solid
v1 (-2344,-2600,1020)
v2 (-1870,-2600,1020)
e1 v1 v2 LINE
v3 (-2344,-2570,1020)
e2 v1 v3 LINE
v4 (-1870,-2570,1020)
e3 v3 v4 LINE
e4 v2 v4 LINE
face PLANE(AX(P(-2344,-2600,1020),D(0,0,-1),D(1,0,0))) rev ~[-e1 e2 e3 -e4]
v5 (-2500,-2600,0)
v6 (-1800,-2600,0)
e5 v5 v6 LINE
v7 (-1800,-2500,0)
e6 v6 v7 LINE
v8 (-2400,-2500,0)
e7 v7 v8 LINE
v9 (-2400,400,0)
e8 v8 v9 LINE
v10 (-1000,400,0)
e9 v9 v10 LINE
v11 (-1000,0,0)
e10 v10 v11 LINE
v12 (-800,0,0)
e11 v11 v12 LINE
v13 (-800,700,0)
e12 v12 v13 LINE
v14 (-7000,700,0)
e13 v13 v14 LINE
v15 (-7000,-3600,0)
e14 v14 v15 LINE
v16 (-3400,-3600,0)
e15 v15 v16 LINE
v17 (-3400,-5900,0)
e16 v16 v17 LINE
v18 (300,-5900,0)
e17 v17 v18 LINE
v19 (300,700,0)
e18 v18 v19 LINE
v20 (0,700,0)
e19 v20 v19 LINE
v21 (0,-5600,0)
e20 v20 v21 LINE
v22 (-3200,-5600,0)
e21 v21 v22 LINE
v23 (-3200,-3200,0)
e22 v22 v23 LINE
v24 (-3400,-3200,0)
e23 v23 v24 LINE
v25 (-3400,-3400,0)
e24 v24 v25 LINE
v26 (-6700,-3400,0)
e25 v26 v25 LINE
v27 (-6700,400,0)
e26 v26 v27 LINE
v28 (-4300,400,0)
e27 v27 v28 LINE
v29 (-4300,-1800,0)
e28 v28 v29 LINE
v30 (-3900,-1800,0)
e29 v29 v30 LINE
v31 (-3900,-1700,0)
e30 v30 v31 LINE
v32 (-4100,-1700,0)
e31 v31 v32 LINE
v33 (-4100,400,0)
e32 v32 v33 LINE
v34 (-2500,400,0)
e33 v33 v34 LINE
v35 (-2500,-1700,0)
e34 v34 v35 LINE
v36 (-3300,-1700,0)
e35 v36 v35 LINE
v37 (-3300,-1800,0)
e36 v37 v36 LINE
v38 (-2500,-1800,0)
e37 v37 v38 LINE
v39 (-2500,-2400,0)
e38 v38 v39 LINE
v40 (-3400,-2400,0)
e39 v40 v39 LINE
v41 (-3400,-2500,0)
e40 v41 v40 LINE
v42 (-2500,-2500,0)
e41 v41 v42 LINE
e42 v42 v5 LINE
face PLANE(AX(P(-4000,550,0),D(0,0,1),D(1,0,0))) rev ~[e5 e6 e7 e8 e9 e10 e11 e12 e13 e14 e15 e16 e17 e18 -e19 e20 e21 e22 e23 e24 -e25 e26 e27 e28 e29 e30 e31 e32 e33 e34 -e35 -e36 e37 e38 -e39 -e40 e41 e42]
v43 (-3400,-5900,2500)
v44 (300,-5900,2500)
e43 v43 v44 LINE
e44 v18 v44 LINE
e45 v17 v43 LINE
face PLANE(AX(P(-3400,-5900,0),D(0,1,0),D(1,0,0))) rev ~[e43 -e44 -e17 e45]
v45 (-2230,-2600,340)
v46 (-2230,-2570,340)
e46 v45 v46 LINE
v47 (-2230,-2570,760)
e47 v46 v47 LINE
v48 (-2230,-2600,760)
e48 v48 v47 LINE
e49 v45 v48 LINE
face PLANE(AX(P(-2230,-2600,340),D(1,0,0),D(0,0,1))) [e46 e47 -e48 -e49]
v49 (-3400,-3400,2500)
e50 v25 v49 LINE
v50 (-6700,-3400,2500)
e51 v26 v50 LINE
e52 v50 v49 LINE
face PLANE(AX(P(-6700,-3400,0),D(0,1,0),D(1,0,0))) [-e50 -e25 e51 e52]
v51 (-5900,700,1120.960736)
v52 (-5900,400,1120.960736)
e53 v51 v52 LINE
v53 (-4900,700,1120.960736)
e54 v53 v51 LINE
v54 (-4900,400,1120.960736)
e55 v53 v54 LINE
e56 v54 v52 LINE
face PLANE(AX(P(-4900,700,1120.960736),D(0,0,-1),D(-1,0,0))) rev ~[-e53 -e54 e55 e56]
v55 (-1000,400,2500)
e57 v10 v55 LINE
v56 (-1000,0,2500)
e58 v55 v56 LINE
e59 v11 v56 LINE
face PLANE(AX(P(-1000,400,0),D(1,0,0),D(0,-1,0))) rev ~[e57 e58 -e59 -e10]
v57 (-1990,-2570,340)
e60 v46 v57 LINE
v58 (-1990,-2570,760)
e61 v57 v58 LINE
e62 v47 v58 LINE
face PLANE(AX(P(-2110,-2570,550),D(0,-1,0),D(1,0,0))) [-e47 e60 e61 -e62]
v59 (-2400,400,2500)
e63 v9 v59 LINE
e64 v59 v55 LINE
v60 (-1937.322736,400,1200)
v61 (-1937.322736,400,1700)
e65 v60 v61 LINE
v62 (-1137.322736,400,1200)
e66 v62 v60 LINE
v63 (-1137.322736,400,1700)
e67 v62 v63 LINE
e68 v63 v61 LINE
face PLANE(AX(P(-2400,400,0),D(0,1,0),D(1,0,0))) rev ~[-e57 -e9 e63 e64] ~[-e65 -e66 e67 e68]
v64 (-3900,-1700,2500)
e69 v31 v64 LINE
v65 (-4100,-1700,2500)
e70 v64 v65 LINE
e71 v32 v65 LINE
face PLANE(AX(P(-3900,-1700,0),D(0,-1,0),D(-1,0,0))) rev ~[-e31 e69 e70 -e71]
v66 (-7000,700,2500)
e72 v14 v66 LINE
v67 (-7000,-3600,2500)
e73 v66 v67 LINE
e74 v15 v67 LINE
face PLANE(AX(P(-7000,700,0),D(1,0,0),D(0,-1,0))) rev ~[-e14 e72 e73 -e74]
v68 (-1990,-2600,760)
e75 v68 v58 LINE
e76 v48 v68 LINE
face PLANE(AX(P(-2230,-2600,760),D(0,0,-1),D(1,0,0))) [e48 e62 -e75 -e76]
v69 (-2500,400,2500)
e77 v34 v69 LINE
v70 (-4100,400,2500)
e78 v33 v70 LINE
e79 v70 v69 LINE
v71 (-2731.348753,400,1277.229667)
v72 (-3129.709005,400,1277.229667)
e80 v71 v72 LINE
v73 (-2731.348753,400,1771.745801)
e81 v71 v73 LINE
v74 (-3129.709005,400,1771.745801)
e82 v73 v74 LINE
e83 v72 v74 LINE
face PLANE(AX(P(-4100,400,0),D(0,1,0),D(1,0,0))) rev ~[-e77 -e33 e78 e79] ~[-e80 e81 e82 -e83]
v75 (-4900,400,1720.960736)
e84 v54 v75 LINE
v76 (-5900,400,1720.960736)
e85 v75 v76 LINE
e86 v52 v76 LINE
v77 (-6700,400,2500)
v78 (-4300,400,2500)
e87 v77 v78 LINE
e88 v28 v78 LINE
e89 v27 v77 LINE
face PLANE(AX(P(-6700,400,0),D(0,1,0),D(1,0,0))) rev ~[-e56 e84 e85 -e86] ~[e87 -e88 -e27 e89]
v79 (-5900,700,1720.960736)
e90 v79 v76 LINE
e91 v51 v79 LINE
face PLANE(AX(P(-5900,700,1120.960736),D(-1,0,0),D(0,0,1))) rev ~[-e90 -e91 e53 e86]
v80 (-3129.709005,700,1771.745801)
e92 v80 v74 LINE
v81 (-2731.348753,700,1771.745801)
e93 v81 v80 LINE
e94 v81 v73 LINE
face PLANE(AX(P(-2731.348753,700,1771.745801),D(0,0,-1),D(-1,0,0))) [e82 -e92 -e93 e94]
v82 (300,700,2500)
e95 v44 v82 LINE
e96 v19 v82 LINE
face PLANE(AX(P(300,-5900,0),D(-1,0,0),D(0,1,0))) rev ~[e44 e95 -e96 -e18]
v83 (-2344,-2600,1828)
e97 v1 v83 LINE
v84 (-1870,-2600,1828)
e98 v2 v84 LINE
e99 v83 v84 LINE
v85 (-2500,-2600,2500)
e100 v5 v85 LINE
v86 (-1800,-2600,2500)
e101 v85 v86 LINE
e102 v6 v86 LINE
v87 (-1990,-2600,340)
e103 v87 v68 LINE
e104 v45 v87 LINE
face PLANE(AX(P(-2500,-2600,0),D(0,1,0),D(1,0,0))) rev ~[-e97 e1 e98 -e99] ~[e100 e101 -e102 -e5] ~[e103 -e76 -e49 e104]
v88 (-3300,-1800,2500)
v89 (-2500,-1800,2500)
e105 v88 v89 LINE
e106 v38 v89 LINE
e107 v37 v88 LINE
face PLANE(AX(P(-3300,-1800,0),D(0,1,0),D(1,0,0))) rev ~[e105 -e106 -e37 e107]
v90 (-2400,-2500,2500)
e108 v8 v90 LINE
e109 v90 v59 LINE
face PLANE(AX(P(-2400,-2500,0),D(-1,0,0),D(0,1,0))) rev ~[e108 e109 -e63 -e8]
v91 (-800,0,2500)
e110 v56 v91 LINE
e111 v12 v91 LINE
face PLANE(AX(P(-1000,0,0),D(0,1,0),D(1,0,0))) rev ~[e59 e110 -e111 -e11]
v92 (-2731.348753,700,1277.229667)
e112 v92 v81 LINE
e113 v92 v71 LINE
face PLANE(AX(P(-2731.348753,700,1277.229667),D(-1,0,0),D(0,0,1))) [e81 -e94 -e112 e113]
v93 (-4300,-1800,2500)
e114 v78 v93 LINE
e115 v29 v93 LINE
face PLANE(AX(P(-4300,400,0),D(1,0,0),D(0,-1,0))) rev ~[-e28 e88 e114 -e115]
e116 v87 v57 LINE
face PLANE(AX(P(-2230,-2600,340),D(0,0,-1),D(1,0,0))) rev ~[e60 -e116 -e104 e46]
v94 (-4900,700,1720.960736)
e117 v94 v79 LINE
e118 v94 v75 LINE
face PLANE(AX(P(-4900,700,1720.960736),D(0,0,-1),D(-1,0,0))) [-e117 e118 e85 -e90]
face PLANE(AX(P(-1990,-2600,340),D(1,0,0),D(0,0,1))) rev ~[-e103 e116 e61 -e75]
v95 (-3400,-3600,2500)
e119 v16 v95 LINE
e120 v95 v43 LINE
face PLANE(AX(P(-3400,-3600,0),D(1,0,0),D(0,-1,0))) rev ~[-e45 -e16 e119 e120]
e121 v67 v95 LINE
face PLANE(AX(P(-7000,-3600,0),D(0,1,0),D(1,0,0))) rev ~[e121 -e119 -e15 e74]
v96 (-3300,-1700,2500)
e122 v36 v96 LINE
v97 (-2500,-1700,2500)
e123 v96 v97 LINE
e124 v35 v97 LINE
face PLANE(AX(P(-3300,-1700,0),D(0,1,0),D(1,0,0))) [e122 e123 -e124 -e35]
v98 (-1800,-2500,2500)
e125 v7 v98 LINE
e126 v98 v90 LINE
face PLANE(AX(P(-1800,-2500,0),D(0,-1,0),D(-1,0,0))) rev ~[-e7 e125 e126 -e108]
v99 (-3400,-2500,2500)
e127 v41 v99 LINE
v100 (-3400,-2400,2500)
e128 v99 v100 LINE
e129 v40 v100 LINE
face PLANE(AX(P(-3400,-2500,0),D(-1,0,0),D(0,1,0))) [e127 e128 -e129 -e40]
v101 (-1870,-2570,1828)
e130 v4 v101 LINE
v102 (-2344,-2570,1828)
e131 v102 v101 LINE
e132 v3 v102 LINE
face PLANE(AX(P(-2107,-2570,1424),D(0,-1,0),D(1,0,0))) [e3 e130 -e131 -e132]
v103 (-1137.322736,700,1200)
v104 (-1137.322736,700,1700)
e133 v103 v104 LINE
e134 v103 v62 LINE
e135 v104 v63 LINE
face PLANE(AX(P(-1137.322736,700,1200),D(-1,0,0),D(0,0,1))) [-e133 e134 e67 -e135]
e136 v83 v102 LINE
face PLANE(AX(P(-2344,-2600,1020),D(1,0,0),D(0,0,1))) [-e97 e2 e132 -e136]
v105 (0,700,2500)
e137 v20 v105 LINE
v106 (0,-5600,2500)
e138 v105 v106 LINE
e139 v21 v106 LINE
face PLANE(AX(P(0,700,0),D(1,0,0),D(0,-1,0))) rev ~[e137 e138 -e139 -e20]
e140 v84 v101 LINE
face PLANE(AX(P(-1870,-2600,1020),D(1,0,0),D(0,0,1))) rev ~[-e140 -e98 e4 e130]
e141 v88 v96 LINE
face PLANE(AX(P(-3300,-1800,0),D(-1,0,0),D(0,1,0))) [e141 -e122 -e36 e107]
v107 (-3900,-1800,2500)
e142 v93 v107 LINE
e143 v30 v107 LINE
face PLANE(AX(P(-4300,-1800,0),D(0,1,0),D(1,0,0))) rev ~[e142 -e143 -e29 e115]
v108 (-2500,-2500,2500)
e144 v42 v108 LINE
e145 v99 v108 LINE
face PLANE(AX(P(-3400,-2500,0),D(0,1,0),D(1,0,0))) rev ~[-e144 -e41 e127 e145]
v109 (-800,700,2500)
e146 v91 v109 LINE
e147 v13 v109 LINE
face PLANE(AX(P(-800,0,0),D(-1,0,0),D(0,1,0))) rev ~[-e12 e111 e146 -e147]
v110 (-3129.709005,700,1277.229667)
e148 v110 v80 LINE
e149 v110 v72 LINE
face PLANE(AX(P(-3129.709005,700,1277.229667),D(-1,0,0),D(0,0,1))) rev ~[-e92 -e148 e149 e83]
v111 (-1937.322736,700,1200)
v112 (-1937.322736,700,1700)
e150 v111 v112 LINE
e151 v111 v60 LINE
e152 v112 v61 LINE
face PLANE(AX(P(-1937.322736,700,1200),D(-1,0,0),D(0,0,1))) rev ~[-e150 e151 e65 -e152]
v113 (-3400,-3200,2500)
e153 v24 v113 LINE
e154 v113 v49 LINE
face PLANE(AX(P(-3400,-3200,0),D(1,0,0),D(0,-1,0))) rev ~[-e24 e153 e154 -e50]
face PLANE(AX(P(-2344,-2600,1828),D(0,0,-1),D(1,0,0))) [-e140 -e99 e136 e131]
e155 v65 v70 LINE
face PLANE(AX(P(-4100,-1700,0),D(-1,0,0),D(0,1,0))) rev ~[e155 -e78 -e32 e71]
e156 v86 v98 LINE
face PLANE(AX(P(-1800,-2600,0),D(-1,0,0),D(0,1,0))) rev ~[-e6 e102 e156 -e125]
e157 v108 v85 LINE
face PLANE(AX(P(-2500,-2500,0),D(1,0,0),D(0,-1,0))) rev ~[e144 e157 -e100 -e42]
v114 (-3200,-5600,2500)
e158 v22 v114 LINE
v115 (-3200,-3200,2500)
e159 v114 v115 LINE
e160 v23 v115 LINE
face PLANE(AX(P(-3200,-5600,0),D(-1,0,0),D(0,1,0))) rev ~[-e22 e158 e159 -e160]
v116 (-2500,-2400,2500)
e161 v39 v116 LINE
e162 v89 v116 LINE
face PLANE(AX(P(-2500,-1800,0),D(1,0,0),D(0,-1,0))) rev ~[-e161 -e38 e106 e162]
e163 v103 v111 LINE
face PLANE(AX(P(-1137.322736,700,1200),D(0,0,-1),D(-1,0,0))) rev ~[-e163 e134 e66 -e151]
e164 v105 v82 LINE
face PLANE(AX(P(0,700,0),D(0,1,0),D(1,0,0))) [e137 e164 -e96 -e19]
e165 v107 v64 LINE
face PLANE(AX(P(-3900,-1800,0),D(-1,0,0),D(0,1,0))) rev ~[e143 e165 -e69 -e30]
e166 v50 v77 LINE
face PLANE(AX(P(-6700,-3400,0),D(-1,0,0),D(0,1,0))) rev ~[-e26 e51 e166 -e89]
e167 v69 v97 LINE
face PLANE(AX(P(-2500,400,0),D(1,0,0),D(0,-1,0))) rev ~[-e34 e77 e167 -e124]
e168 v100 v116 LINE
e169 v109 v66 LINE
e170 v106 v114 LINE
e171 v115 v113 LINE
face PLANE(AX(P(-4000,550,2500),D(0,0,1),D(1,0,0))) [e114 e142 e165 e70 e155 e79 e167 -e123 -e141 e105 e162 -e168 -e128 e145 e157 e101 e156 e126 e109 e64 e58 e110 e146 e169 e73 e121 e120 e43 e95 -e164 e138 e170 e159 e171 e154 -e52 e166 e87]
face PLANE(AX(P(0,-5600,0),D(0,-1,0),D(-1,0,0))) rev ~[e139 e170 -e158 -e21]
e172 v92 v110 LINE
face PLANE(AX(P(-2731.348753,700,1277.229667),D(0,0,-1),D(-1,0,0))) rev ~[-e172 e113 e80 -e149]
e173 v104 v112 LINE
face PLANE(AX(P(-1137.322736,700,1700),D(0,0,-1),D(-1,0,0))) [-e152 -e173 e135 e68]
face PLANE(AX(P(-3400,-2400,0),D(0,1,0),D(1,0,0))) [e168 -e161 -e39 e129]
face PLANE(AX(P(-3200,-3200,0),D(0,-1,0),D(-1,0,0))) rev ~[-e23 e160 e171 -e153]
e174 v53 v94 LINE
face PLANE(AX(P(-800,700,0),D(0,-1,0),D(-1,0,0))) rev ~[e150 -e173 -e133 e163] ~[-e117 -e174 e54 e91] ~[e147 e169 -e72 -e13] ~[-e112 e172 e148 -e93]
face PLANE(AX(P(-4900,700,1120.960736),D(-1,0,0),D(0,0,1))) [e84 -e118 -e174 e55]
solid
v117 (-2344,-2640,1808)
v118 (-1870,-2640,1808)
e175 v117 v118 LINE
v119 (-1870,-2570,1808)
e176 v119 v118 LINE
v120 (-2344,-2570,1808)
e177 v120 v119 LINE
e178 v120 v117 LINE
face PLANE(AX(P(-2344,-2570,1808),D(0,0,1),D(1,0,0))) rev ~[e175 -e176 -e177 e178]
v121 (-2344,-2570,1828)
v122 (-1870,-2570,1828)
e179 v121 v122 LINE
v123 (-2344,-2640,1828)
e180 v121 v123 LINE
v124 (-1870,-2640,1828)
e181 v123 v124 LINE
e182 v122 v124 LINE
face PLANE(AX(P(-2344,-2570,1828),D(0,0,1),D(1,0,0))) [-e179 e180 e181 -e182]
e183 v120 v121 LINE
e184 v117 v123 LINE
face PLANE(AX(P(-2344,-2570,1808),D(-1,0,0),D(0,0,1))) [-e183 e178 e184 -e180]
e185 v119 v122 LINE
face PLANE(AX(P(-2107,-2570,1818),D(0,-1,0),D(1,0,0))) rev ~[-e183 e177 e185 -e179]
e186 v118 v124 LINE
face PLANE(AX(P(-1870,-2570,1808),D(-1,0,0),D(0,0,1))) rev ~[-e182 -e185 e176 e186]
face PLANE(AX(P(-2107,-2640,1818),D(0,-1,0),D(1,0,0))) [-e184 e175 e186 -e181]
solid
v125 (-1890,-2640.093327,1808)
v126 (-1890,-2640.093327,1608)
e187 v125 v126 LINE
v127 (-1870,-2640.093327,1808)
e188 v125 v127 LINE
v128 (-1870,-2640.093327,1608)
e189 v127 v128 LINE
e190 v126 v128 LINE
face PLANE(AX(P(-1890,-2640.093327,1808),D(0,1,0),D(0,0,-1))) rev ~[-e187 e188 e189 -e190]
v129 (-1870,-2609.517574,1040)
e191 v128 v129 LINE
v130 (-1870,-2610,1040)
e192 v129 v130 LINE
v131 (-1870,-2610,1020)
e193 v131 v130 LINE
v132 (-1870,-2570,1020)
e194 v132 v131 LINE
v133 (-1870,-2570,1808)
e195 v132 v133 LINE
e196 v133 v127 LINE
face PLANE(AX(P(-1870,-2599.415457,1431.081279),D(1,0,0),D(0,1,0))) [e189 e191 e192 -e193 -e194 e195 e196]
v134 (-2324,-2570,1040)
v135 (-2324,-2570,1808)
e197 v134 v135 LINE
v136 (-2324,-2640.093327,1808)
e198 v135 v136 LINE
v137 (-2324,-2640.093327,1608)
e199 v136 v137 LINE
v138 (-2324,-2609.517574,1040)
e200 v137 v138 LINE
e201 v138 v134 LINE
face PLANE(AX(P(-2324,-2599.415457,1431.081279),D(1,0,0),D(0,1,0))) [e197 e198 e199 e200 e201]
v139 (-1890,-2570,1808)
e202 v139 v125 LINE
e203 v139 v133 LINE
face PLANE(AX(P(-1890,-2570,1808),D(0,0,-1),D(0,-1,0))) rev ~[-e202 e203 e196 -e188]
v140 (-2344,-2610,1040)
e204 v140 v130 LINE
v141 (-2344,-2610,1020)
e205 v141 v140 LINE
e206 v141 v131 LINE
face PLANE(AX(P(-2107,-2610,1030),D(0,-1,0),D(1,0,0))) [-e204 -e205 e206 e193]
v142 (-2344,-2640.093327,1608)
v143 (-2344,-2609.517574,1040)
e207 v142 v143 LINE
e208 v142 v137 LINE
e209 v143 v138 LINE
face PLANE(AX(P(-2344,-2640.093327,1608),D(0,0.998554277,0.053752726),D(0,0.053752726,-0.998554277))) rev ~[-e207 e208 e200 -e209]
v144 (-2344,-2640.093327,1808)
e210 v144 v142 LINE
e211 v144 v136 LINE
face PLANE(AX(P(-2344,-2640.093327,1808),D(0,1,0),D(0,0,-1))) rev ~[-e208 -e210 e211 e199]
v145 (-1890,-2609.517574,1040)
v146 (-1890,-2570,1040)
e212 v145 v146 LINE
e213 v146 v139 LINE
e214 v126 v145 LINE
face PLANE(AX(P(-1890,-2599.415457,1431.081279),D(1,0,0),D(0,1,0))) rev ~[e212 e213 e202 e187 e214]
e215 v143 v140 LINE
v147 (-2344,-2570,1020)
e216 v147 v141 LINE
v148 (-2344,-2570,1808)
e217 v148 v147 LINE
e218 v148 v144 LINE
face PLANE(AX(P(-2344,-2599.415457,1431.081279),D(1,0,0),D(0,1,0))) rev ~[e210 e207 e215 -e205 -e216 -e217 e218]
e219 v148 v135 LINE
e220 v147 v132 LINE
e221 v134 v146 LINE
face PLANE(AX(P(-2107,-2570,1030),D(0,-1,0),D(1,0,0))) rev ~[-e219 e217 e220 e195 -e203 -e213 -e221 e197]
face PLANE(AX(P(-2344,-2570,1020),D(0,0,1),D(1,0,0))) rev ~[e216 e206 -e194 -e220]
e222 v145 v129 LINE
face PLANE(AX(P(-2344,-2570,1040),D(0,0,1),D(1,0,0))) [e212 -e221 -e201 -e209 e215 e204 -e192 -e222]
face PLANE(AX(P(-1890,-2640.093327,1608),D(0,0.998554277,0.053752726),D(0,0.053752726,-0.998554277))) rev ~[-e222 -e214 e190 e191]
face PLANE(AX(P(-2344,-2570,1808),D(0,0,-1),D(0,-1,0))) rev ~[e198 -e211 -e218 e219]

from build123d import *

# Parameters (mm, degrees)
F0_W      = 3300
F0_H      = 200
F0_W_2    = 300
F0_H_2    = 5600
F0_H_3    = 700
F0_W_3    = 900
F0_H_4    = 100
F0_W_4    = 800
F0_W_5    = 200
F0_H_5    = 2100
F1_DEPTH  = 2500
F2_W      = 1000
F2_H      = 600
F2_W_2    = 800
F2_H_2    = 500
F2_W_3    = 398.3602523804
F2_H_3    = 494.5161342621
F3_DEPTH  = 990
F4_W      = 240
F4_H      = 420
F4_W_2    = 474
F4_H_2    = 808
F5_DEPTH  = 30
F6_W      = 474
F6_H      = 20
F7_DEPTH  = 40
F8_W      = 474
F8_H      = 20
F9_DEPTH  = 70
F11_DEPTH = 20
F12_START = 454
F12_DEPTH = 20


with BuildPart() as f1:
    # F0 (on Top) → F1 (new body)
    with BuildSketch(Plane.XY):
        Polygon((-7000, 400), (-6700, 400), (-4300, 400), (-4100, 400), (-2500, 400), (-2400, 400), (-1000, 400), (-1000, 700), (-7000, 700), align=None)
        Polygon((-7000, -3600), (-6700, -3600), (-6700, -3400), (-6700, 400), (-7000, 400), align=None)
        with Locations((-5050, -3500)):
            Rectangle(F0_W, F0_H)
        Polygon((-3200, -5900), (-3200, -5600), (-3200, -3200), (-3400, -3200), (-3400, -3400), (-3400, -3600), (-3400, -5900), align=None)
        Polygon((300, -5600), (0, -5600), (-3200, -5600), (-3200, -5900), (300, -5900), align=None)
        with Locations((150, -2800)):
            Rectangle(F0_W_2, F0_H_2)
        with Locations((150, 350)):
            Rectangle(F0_W_2, F0_H_3)
        Polygon((-800, 700), (-1000, 700), (-1000, 400), (-1000, 0), (-800, 0), align=None)
        Polygon((-1800, -2500), (-2400, -2500), (-2500, -2500), (-2500, -2600), (-1800, -2600), align=None)
        Polygon((-2400, 400), (-2500, 400), (-2500, -1700), (-2500, -1800), (-2500, -2400), (-2500, -2500), (-2400, -2500), align=None)
        with Locations((-2950, -2450)):
            Rectangle(F0_W_3, F0_H_4)
        with Locations((-2900, -1750)):
            Rectangle(F0_W_4, F0_H_4)
        with Locations((-4000, -1750)):
            Rectangle(F0_W_5, F0_H_4)
        with Locations((-4200, -1750)):
            Rectangle(F0_W_5, F0_H_4)
        with Locations((-4200, -650)):
            Rectangle(F0_W_5, F0_H_5)
    extrude(amount=F1_DEPTH)

    # F2 (on face) → F3 (cut)
    with BuildSketch(Plane(origin=(0, 700, 0), x_dir=(-1, 0, 0), z_dir=(0, 1, 0))):
        with Locations((5400, 1420.9607362747)):
            Rectangle(F2_W, F2_H)
        with Locations((1537.3227357864, 1450)):
            Rectangle(F2_W_2, F2_H_2)
        with Locations((2930.5288791656, 1524.4877338409)):
            Rectangle(F2_W_3, F2_H_3)
    extrude(amount=-F3_DEPTH, mode=Mode.SUBTRACT)

    # F4 (on face) → F5 (cut)
    with BuildSketch(Plane.XZ.offset(2600)):
        with Locations((-2110, 550)):
            Rectangle(F4_W, F4_H)
        with Locations((-2107, 1424)):
            Rectangle(F4_W_2, F4_H_2)
    extrude(amount=-F5_DEPTH, mode=Mode.SUBTRACT)


with BuildPart() as f7:
    # F6 (on face) → F7 (new body)
    with BuildSketch(Plane.XZ.offset(2570)):
        with Locations((-2107, 1030)):
            Rectangle(F6_W, F6_H)
    extrude(amount=F7_DEPTH)

    # F10 (on face) → F11 (join)
    with BuildSketch(Plane.YZ.offset(-2344)):
        Polygon((-2640.0933265686, 1608), (-2609.5175743103, 1040), (-2570, 1040), (-2570, 1808), (-2640.0933265686, 1808), align=None)
    extrude(amount=F11_DEPTH)

    # F10 (on face) → F12 (join)
    with BuildSketch(Plane.YZ.offset(-2344).offset(F12_START)):
        Polygon((-2640.0933265686, 1608), (-2609.5175743103, 1040), (-2570, 1040), (-2570, 1808), (-2640.0933265686, 1808), align=None)
    extrude(amount=F12_DEPTH)


with BuildPart() as f9:
    # F8 (on face) → F9 (new body)
    with BuildSketch(Plane.XZ.offset(2570)):
        with Locations((-2107, 1818)):
            Rectangle(F8_W, F8_H)
    extrude(amount=F9_DEPTH)


solid = Compound([f1.part, f7.part, f9.part])
